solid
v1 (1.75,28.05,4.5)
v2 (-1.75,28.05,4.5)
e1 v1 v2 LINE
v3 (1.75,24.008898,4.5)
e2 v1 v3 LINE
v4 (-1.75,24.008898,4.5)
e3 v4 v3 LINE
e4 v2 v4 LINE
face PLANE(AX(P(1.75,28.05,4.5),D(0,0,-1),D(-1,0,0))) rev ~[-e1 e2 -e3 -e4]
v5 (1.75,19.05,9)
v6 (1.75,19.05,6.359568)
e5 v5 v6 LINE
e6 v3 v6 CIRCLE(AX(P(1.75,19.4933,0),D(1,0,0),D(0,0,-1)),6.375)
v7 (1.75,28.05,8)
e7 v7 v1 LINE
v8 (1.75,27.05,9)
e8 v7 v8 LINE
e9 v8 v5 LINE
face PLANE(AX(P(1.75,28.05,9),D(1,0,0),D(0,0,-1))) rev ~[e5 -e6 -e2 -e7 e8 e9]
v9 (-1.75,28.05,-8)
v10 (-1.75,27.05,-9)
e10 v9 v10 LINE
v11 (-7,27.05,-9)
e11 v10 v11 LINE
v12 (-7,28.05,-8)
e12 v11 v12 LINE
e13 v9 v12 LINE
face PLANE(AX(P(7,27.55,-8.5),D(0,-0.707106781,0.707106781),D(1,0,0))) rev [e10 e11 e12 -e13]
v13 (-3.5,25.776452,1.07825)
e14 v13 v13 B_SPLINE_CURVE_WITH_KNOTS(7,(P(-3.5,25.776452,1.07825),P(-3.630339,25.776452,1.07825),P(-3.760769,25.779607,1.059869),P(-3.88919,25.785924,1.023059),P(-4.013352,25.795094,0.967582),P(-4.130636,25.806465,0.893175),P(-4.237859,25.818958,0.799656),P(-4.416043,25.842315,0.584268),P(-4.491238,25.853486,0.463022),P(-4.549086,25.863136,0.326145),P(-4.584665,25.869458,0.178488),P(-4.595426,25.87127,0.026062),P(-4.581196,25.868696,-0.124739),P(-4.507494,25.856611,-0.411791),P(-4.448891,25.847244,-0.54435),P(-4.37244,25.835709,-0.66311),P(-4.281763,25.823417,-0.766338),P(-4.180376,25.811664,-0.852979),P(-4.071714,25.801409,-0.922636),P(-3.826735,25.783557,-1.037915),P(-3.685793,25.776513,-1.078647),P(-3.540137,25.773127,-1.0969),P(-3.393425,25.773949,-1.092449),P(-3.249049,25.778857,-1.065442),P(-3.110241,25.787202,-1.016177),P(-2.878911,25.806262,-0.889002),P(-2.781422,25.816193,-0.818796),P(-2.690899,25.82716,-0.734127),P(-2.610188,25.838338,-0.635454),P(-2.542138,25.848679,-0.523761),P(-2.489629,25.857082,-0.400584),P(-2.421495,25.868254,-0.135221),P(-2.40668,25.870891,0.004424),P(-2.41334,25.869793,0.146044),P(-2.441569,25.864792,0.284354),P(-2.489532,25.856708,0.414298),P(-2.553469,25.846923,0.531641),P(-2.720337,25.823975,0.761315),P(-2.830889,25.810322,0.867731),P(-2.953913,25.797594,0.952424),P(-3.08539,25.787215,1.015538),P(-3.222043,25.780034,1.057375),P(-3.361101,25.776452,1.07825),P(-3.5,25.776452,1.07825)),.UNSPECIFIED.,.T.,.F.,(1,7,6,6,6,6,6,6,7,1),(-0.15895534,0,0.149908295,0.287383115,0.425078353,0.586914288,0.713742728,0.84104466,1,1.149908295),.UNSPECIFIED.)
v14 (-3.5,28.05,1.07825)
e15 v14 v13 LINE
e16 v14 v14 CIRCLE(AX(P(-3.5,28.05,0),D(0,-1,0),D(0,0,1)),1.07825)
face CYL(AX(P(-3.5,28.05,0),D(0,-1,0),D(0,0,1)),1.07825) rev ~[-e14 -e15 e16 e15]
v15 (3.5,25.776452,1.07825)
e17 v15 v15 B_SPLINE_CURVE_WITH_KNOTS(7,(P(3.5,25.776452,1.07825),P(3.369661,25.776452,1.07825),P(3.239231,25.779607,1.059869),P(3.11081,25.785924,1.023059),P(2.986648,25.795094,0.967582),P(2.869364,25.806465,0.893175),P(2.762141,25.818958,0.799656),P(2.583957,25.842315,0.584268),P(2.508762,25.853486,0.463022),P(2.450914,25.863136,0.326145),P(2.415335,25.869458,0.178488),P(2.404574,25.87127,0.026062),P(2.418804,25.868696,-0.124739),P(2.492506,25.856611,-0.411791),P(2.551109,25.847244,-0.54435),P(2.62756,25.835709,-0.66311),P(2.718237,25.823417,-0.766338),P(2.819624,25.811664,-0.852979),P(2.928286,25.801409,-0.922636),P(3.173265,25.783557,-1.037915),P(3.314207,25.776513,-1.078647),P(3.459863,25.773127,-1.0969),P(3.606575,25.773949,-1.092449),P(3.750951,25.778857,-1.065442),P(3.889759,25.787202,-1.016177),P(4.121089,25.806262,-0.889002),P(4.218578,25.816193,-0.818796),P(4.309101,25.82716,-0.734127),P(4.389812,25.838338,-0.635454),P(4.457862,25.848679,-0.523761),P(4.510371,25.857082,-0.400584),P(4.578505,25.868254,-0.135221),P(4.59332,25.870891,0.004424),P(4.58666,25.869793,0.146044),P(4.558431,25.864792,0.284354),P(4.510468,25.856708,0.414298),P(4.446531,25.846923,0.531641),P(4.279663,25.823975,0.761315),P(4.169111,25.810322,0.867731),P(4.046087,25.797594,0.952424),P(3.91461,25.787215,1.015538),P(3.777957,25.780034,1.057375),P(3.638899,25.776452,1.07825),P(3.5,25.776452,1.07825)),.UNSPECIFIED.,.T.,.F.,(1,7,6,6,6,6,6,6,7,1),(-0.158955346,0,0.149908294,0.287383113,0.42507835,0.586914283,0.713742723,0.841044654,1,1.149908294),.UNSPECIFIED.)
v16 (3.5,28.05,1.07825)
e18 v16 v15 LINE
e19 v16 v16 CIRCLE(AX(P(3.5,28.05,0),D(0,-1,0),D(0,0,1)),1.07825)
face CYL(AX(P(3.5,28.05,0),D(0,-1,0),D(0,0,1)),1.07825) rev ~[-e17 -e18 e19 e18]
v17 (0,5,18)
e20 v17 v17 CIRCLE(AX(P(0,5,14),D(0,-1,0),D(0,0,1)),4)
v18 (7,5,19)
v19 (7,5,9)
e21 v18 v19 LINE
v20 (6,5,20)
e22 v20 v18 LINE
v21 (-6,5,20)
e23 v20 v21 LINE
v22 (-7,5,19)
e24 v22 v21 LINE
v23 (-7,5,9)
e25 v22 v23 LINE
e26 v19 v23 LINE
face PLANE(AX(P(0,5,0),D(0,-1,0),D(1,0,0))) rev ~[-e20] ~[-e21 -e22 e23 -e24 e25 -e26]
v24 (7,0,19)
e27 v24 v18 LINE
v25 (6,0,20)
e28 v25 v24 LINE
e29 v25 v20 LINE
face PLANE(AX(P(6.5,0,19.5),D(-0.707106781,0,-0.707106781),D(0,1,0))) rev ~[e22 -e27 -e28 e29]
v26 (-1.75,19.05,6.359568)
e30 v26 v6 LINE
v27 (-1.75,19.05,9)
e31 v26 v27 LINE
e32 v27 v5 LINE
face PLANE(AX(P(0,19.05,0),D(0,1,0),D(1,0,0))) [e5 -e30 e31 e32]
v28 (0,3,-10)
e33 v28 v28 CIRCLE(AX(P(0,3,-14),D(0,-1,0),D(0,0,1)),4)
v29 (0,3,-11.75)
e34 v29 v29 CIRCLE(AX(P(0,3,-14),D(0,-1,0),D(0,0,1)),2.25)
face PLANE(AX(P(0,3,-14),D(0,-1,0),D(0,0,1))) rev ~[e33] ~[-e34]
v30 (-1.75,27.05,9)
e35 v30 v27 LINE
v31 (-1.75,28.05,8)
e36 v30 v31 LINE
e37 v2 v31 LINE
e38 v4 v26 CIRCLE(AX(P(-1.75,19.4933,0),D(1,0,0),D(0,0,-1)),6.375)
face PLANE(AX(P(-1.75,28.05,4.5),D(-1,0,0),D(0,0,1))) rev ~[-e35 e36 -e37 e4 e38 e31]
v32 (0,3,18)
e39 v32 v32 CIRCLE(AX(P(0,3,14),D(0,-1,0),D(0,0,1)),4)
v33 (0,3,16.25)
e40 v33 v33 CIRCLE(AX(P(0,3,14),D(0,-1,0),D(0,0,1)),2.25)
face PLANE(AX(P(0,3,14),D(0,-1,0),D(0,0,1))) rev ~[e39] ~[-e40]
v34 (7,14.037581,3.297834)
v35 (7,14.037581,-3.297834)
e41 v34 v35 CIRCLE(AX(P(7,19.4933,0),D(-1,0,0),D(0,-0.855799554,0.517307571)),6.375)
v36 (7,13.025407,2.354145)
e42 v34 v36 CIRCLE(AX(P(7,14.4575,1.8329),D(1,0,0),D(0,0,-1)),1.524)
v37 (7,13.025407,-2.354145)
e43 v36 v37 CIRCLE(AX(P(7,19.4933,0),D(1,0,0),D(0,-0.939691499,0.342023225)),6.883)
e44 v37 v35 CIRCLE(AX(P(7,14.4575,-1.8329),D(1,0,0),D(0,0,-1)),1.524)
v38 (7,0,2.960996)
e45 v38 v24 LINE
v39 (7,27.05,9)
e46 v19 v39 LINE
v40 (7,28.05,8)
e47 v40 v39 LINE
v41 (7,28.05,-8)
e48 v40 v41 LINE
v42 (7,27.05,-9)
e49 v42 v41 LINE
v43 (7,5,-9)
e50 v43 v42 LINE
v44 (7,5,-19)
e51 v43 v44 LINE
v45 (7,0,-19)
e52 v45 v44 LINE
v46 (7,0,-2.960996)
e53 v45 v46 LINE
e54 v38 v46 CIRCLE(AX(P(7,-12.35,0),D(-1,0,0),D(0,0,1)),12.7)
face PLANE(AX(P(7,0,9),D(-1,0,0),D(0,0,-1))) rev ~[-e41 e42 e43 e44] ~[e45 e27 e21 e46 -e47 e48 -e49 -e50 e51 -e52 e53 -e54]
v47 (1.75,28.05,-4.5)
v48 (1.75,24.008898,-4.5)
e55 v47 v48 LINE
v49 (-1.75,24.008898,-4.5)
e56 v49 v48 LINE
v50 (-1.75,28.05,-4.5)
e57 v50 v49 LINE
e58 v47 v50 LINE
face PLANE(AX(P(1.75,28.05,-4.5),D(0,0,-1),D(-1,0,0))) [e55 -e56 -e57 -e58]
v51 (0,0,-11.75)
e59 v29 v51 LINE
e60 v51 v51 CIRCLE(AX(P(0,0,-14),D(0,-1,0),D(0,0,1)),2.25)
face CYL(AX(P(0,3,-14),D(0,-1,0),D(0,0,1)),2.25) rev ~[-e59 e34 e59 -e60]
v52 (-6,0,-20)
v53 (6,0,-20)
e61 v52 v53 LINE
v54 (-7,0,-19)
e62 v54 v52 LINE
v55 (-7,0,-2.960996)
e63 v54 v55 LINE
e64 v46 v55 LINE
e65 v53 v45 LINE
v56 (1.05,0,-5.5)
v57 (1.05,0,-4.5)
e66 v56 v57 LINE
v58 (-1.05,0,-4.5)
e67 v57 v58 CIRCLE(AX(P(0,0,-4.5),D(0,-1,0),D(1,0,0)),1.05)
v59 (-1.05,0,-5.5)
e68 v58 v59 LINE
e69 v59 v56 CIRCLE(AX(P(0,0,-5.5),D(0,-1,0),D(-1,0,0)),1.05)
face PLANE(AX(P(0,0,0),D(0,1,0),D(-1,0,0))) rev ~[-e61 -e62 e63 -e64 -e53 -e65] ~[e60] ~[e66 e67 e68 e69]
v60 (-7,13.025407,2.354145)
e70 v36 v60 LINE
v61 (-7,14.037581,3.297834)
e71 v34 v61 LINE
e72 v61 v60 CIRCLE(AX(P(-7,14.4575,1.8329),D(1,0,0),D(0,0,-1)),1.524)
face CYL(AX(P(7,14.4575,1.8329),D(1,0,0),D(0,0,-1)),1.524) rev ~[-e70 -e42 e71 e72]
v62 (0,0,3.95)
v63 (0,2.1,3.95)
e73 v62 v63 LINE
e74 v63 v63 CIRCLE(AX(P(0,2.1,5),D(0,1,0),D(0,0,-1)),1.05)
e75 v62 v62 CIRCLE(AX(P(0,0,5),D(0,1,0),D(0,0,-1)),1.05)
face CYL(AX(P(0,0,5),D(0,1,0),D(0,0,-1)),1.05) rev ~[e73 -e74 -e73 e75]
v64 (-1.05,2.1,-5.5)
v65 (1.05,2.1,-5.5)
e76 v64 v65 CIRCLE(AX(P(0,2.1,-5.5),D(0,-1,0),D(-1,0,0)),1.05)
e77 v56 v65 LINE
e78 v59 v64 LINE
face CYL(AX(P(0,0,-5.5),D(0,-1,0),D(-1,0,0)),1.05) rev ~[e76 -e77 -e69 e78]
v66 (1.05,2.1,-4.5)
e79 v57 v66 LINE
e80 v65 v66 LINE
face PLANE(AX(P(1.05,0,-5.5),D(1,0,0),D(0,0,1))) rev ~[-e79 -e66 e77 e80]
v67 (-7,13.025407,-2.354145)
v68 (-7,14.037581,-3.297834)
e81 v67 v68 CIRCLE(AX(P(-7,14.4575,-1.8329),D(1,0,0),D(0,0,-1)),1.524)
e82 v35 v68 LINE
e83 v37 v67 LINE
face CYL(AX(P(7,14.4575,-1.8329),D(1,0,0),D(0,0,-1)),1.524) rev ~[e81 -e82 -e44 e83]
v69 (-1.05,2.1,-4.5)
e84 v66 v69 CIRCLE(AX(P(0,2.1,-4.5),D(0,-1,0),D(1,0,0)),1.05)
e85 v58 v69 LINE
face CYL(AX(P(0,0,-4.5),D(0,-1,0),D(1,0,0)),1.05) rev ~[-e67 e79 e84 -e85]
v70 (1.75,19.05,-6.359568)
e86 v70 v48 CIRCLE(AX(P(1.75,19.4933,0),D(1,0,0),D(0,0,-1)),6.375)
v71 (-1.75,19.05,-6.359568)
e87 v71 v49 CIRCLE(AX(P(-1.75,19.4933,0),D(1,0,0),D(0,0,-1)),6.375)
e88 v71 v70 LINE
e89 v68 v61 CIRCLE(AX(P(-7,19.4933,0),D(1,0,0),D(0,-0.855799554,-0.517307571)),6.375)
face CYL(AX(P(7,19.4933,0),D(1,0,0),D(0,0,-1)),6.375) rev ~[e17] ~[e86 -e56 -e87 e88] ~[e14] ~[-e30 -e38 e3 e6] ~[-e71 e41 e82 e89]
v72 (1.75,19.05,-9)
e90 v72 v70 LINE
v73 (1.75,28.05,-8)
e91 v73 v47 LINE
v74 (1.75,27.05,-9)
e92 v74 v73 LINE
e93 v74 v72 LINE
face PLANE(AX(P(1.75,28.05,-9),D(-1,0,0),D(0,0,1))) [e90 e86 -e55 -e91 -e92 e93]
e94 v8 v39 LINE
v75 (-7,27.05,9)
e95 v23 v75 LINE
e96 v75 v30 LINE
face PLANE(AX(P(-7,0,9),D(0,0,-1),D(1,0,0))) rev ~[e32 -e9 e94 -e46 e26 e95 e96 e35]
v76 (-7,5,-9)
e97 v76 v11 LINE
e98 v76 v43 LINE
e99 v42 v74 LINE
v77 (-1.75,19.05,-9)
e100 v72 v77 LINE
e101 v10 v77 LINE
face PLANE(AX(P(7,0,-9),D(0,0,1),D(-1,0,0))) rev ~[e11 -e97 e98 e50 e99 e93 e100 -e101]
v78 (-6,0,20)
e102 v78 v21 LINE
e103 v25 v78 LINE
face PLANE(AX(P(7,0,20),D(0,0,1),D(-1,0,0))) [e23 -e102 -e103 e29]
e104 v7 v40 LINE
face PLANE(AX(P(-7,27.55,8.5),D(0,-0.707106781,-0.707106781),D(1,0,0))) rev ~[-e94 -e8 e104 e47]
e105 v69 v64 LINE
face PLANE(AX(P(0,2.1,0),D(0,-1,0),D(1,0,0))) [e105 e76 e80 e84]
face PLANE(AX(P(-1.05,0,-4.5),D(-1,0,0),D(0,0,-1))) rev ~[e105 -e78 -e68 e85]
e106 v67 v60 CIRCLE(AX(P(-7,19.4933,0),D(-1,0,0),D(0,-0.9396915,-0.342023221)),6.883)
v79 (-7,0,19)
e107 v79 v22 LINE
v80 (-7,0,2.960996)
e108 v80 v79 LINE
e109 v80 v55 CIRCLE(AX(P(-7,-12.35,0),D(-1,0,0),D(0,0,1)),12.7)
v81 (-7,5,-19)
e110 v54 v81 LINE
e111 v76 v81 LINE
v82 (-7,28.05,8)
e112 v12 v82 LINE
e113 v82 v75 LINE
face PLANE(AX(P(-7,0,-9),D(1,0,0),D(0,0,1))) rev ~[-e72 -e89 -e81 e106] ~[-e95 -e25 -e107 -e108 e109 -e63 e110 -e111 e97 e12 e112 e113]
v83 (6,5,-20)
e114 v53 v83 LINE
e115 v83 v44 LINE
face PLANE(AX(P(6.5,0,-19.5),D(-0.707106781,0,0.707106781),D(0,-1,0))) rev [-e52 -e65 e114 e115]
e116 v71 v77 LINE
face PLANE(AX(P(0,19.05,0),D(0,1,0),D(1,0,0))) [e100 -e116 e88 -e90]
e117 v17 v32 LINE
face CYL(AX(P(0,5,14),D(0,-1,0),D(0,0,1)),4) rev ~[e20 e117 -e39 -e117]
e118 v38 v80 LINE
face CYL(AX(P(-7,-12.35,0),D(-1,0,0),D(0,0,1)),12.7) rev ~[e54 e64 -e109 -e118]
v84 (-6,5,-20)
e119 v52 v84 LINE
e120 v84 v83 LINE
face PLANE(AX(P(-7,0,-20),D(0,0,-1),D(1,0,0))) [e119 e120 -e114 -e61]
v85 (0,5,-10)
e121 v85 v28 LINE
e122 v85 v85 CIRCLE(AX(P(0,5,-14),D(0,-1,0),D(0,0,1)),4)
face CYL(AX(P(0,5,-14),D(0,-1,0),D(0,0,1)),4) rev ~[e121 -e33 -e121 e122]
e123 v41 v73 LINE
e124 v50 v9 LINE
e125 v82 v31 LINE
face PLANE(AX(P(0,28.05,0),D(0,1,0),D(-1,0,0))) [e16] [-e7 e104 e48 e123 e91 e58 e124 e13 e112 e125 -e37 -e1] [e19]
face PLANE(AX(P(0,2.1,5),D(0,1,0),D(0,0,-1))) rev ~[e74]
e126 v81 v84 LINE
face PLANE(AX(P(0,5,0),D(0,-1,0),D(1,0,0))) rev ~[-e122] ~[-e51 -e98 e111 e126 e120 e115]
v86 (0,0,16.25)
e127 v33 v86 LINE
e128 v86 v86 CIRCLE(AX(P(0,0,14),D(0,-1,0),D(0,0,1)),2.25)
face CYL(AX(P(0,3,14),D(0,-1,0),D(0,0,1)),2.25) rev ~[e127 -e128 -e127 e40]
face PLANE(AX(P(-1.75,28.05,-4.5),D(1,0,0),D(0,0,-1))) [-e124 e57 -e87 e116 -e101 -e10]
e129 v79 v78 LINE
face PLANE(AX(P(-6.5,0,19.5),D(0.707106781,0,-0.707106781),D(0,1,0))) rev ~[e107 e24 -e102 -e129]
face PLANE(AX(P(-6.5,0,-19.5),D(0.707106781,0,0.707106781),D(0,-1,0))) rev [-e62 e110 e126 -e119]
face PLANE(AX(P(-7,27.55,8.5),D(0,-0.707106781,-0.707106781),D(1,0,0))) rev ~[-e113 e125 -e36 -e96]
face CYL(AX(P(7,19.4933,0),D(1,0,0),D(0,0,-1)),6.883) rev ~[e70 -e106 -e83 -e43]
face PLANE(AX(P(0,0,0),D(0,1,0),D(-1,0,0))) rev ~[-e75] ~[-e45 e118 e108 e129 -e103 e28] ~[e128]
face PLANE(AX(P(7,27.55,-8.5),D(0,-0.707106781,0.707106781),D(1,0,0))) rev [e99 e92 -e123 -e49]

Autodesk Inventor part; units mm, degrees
ref_plane "YZ Plane" through (0, 0, 0) normal (1, 0, 0) x (0, 1, 0)
ref_plane "XZ Plane" through (0, 0, 0) normal (0, 1, 0) x (-1, 0, 0)
ref_plane "XY Plane" through (0, 0, 0) normal (0, 0, 1) x (1, 0, 0)
sketch "Sketch1" plane through (0, 0, 0) normal (0, 1, 0) x (-1, 0, 0)
  line L0 (7, 9) -> (-7, 9)
  line L1 (-7, 9) -> (-7, -9)
  line L2 (-7, -9) -> (7, -9)
  line L3 (7, -9) -> (7, 9)
  line L4 (7, 9) -> (-7, -9) construction
  line L5 (-7, 9) -> (7, -9) construction
  point P0 (0, 0)
  dimension "POST_WIDTH" = 18
  dimension "POST_LENGTH" = 14
extrude "Extrusion1" add sketch "Sketch1" along normal blind 28.05
sketch "Sketch2" plane through (0, 0, 0) normal (0, -1, 0) x (1, 0, 0)
  line L0 (-7, -20) -> (7, -20)
  line L1 (7, -20) -> (7, 20)
  line L2 (7, 20) -> (-7, 20)
  line L3 (-7, 20) -> (-7, -20)
  line L4 (-7, -20) -> (7, 20) construction
  line L5 (7, -20) -> (-7, 20) construction
  line L6 (-7, -9) -> (-7, 9) projected
  line L7 (-7, 9) -> (7, 9) projected
  point P0 (0, 0)
  dimension "d4" = 0
  dimension "d5" = 11
extrude "Extrusion2" add sketch "Sketch2" against normal blind 5
sketch "Sketch3" plane through (0, 5, 0) normal (0, 1, 0) x (1, 0, 0)
  line L0 (-7, 20) -> (7, 20) projected
  line L1 (0, 20) -> (0, -20)
  line L2 (7, -20) -> (-7, -20) projected
  line L3 (7, -9) -> (7, 9) projected
  line L4 (7, 0) -> (-7, 0)
  line L5 (-7, 20) -> (-7, -20) projected
  point P0 (0, 0)
  point P1 (0, -14)
  point P2 (0, 14)
  dimension "d15" = 0
  dimension "d16" = 6
hole "Hole1" at (0, 5, 14) at (0, 5, -14) direction (0, -1, 0) diameter 4.5 end through all counterbore diameter 8 counterbore depth 2 clearance for "Socket Head Cap Screw" size "#8" standard "Ansi Unified Screw Threads"
chamfer "Chamfer2" distance 1 angle 45 2 edges at (0, 28.05, 9) (0, 28.05, -9)
sketch "Sketch8" plane through (7, 5, -9) normal (1, 0, 0) x (0, 0, -1)
  circle A0 centre (-9, 14.4933) radius 6.375
  circle A1 centre (-9, 14.4933) radius 6.883
  circle A2 centre (-10.8329, 9.4575) radius 1.524
  line L0 (-9, 14.4933) -> (-9, 7.6103)
  circle A3 centre (-7.1671, 9.4575) radius 1.524
  line L1 (-9, 14.4933) -> (-10.8329, 9.4575)
  line L2 (-18, 0) -> (-18, 22.05) projected
  line L3 (-17, 23.05) -> (-1, 23.05) projected
  circle A4 centre (-9, 14.05) radius 6
  line L4 (11, -5) -> (-29, -5) projected
  point P0 (-9, -5)
  point P1 (-6.6459, 8.0254)
  point P2 (-8.0195, 8.1942)
  point P3 (-12.2979, 9.0376)
  point P4 (-11.3541, 8.0254)
  point P5 (-5.7021, 9.0376)
  point P6 (-9.9805, 8.1942)
  dimension "d95" = 12
  dimension "HOLE_SIZE" = 12.75
  dimension "THREE_POINT_SIZE" = 13.766
  dimension "d51" = 3.048
  dimension "d52" = 20
  dimension "d55" = 9
  dimension "d96" = 19.05
extrude "Extrusion6" cut sketch "Sketch8" against normal up to surface (14 mm away) contours A0 A4 | A2 A0 | A4 A3 A0 L0 L1 A2 | A4 A2 | A0 A2 A4 | A4 A3 A0 | A0 A3 | A3 A4 | A2 L1 L0 A0 | A0 L0 A4 A2 | A2 A4 L0 A1 | A3 A4 L0 A0 | A1 L0 A4 A3
sketch "Sketch9" plane through (0, 28.05, 0) normal (0, 1, 0) x (1, 0, 0)
  line L0 (-7, 8) -> (-7, -8) projected
  line L1 (-7, -9) -> (7, -9) projected
  line L2 (7, -8) -> (7, 8) projected
  point P0 (0, 0)
  point P1 (-3.5, 0)
  point P2 (3.5, 0)
  dimension "d64" = 3.5
  dimension "d65" = 9
  dimension "d94" = 3.5
hole "Hole3" at (-3.5, 28.05, 0) at (3.5, 28.05, 0) direction (0, -1, 0) diameter 2.1565 end up to surface thread size "4-40 UNC" class "2B" standard "ANSI Unified Screw Threads"
chamfer "Chamfer3" distance 1 angle 45 4 edges at (7, 2.5, 20) (-7, 2.5, 20) (7, 2.5, -20) (-7, 2.5, -20)
sketch "Sketch10" plane through (0, 28.05, 0) normal (0, 1, 0) x (1, 0, 0)
  line L0 (-7, -9) -> (7, -9) projected
  line L1 (-1.75, -9) -> (1.75, -9)
  line L2 (1.75, -9) -> (1.75, -4.5)
  line L3 (1.75, -4.5) -> (-1.75, -4.5)
  line L4 (-1.75, -4.5) -> (-1.75, -9)
  line L5 (7, 9) -> (-7, 9) projected
  line L6 (-9.8, 0) -> (9.8, 0) projected
  line L7 (-1.75, 9) -> (1.75, 9)
  line L8 (1.75, 9) -> (1.75, 4.5)
  line L9 (1.75, 4.5) -> (-1.75, 4.5)
  line L10 (-1.75, 4.5) -> (-1.75, 9)
  point P0 (0, 0)
  point P1 (1.75, 5.6664)
  point P2 (1.75, 9)
  dimension "d71" = 4.5
  dimension "d72" = 3.5
  dimension "d73" = 1.75
extrude "Extrusion7" cut sketch "Sketch10" against normal blind 9
sketch "Sketch11" plane through (0, 0, 0) normal (0, -1, 0) x (1, 0, 0)
  line L0 (0, -4.5) -> (0, -5.5) construction
  line L1 (-1.05, -4.5) -> (-1.05, -5.5)
  line L2 (1.05, -5.5) -> (1.05, -4.5)
  arc A0 (1.05, -4.5) -> (-1.05, -4.5) centre (0, -4.5) ccw
  arc A1 (-1.05, -5.5) -> (1.05, -5.5) centre (0, -5.5) ccw
  point P0 (0, 0)
  point P1 (0, 5)
  point P2 (0, -5)
  dimension "d74" = 10
  dimension "d75" = 0
  dimension "d76" = 0
  dimension "d77" = 5
  dimension "d78" = 1.05
  dimension "d79" = 1
hole "Hole4" at (0, 0, 5) direction (0, 1, 0) diameter 2.1 depth 2.1
extrude "Extrusion8" cut sketch "Sketch11" against normal blind 2.1
sketch "Sketch12" plane through (-7, 5, 9) normal (-1, 0, 0) x (0, 0, 1)
  circle A0 centre (-9, -17.35) radius 12.7
  point P0 (-9, -5)
  dimension "d89" = 0
  dimension "d90" = 12.35
  dimension "d91" = 25.4
extrude "Extrusion9" cut sketch "Sketch12" against normal up to surface (14 mm away)
equation "\"HOLE_SIZE\" = 2 * HOLE_RADIUS + HOLE_TOLERANCE"
equation "\"d52\" = 0.5 * THREE_POINT_ANGLE"
equation "\"d55\" = 0.5 * POST_WIDTH"
equation "\"d96\" = BEAM_HEIGHT"
equation "\"d64\" = 0.25 * POST_LENGTH"
equation "\"d65\" = 0.5 * POST_WIDTH"
equation "\"d94\" = d64"
equation "\"d71\" = 0.25 * POST_WIDTH"
equation "\"d72\" = 0.25 * POST_LENGTH"
equation "\"d73\" = 0.125 * POST_LENGTH"
equation "\"d69\" = EDGE_TO_HOLE"
equation "\"EDGE_TO_HOLE\" = POST_HEIGHT - BEAM_HEIGHT"
equation "\"BEAM_HEIGHT\" = 19.05"
equation "\"COLLIMATOR_DIAMETER\" = 12"
equation "\"THREE_POINT_ANGLE\" = 40deg"
equation "\"HOLE_RADIUS\" = 6.35"
equation "\"HOLE_TOLERANCE\" = 0.05"
equation "\"POST_HEIGHT\" = 28.05"
properties part number "ADAPTER_collimator-BH19.05-D12.7"
